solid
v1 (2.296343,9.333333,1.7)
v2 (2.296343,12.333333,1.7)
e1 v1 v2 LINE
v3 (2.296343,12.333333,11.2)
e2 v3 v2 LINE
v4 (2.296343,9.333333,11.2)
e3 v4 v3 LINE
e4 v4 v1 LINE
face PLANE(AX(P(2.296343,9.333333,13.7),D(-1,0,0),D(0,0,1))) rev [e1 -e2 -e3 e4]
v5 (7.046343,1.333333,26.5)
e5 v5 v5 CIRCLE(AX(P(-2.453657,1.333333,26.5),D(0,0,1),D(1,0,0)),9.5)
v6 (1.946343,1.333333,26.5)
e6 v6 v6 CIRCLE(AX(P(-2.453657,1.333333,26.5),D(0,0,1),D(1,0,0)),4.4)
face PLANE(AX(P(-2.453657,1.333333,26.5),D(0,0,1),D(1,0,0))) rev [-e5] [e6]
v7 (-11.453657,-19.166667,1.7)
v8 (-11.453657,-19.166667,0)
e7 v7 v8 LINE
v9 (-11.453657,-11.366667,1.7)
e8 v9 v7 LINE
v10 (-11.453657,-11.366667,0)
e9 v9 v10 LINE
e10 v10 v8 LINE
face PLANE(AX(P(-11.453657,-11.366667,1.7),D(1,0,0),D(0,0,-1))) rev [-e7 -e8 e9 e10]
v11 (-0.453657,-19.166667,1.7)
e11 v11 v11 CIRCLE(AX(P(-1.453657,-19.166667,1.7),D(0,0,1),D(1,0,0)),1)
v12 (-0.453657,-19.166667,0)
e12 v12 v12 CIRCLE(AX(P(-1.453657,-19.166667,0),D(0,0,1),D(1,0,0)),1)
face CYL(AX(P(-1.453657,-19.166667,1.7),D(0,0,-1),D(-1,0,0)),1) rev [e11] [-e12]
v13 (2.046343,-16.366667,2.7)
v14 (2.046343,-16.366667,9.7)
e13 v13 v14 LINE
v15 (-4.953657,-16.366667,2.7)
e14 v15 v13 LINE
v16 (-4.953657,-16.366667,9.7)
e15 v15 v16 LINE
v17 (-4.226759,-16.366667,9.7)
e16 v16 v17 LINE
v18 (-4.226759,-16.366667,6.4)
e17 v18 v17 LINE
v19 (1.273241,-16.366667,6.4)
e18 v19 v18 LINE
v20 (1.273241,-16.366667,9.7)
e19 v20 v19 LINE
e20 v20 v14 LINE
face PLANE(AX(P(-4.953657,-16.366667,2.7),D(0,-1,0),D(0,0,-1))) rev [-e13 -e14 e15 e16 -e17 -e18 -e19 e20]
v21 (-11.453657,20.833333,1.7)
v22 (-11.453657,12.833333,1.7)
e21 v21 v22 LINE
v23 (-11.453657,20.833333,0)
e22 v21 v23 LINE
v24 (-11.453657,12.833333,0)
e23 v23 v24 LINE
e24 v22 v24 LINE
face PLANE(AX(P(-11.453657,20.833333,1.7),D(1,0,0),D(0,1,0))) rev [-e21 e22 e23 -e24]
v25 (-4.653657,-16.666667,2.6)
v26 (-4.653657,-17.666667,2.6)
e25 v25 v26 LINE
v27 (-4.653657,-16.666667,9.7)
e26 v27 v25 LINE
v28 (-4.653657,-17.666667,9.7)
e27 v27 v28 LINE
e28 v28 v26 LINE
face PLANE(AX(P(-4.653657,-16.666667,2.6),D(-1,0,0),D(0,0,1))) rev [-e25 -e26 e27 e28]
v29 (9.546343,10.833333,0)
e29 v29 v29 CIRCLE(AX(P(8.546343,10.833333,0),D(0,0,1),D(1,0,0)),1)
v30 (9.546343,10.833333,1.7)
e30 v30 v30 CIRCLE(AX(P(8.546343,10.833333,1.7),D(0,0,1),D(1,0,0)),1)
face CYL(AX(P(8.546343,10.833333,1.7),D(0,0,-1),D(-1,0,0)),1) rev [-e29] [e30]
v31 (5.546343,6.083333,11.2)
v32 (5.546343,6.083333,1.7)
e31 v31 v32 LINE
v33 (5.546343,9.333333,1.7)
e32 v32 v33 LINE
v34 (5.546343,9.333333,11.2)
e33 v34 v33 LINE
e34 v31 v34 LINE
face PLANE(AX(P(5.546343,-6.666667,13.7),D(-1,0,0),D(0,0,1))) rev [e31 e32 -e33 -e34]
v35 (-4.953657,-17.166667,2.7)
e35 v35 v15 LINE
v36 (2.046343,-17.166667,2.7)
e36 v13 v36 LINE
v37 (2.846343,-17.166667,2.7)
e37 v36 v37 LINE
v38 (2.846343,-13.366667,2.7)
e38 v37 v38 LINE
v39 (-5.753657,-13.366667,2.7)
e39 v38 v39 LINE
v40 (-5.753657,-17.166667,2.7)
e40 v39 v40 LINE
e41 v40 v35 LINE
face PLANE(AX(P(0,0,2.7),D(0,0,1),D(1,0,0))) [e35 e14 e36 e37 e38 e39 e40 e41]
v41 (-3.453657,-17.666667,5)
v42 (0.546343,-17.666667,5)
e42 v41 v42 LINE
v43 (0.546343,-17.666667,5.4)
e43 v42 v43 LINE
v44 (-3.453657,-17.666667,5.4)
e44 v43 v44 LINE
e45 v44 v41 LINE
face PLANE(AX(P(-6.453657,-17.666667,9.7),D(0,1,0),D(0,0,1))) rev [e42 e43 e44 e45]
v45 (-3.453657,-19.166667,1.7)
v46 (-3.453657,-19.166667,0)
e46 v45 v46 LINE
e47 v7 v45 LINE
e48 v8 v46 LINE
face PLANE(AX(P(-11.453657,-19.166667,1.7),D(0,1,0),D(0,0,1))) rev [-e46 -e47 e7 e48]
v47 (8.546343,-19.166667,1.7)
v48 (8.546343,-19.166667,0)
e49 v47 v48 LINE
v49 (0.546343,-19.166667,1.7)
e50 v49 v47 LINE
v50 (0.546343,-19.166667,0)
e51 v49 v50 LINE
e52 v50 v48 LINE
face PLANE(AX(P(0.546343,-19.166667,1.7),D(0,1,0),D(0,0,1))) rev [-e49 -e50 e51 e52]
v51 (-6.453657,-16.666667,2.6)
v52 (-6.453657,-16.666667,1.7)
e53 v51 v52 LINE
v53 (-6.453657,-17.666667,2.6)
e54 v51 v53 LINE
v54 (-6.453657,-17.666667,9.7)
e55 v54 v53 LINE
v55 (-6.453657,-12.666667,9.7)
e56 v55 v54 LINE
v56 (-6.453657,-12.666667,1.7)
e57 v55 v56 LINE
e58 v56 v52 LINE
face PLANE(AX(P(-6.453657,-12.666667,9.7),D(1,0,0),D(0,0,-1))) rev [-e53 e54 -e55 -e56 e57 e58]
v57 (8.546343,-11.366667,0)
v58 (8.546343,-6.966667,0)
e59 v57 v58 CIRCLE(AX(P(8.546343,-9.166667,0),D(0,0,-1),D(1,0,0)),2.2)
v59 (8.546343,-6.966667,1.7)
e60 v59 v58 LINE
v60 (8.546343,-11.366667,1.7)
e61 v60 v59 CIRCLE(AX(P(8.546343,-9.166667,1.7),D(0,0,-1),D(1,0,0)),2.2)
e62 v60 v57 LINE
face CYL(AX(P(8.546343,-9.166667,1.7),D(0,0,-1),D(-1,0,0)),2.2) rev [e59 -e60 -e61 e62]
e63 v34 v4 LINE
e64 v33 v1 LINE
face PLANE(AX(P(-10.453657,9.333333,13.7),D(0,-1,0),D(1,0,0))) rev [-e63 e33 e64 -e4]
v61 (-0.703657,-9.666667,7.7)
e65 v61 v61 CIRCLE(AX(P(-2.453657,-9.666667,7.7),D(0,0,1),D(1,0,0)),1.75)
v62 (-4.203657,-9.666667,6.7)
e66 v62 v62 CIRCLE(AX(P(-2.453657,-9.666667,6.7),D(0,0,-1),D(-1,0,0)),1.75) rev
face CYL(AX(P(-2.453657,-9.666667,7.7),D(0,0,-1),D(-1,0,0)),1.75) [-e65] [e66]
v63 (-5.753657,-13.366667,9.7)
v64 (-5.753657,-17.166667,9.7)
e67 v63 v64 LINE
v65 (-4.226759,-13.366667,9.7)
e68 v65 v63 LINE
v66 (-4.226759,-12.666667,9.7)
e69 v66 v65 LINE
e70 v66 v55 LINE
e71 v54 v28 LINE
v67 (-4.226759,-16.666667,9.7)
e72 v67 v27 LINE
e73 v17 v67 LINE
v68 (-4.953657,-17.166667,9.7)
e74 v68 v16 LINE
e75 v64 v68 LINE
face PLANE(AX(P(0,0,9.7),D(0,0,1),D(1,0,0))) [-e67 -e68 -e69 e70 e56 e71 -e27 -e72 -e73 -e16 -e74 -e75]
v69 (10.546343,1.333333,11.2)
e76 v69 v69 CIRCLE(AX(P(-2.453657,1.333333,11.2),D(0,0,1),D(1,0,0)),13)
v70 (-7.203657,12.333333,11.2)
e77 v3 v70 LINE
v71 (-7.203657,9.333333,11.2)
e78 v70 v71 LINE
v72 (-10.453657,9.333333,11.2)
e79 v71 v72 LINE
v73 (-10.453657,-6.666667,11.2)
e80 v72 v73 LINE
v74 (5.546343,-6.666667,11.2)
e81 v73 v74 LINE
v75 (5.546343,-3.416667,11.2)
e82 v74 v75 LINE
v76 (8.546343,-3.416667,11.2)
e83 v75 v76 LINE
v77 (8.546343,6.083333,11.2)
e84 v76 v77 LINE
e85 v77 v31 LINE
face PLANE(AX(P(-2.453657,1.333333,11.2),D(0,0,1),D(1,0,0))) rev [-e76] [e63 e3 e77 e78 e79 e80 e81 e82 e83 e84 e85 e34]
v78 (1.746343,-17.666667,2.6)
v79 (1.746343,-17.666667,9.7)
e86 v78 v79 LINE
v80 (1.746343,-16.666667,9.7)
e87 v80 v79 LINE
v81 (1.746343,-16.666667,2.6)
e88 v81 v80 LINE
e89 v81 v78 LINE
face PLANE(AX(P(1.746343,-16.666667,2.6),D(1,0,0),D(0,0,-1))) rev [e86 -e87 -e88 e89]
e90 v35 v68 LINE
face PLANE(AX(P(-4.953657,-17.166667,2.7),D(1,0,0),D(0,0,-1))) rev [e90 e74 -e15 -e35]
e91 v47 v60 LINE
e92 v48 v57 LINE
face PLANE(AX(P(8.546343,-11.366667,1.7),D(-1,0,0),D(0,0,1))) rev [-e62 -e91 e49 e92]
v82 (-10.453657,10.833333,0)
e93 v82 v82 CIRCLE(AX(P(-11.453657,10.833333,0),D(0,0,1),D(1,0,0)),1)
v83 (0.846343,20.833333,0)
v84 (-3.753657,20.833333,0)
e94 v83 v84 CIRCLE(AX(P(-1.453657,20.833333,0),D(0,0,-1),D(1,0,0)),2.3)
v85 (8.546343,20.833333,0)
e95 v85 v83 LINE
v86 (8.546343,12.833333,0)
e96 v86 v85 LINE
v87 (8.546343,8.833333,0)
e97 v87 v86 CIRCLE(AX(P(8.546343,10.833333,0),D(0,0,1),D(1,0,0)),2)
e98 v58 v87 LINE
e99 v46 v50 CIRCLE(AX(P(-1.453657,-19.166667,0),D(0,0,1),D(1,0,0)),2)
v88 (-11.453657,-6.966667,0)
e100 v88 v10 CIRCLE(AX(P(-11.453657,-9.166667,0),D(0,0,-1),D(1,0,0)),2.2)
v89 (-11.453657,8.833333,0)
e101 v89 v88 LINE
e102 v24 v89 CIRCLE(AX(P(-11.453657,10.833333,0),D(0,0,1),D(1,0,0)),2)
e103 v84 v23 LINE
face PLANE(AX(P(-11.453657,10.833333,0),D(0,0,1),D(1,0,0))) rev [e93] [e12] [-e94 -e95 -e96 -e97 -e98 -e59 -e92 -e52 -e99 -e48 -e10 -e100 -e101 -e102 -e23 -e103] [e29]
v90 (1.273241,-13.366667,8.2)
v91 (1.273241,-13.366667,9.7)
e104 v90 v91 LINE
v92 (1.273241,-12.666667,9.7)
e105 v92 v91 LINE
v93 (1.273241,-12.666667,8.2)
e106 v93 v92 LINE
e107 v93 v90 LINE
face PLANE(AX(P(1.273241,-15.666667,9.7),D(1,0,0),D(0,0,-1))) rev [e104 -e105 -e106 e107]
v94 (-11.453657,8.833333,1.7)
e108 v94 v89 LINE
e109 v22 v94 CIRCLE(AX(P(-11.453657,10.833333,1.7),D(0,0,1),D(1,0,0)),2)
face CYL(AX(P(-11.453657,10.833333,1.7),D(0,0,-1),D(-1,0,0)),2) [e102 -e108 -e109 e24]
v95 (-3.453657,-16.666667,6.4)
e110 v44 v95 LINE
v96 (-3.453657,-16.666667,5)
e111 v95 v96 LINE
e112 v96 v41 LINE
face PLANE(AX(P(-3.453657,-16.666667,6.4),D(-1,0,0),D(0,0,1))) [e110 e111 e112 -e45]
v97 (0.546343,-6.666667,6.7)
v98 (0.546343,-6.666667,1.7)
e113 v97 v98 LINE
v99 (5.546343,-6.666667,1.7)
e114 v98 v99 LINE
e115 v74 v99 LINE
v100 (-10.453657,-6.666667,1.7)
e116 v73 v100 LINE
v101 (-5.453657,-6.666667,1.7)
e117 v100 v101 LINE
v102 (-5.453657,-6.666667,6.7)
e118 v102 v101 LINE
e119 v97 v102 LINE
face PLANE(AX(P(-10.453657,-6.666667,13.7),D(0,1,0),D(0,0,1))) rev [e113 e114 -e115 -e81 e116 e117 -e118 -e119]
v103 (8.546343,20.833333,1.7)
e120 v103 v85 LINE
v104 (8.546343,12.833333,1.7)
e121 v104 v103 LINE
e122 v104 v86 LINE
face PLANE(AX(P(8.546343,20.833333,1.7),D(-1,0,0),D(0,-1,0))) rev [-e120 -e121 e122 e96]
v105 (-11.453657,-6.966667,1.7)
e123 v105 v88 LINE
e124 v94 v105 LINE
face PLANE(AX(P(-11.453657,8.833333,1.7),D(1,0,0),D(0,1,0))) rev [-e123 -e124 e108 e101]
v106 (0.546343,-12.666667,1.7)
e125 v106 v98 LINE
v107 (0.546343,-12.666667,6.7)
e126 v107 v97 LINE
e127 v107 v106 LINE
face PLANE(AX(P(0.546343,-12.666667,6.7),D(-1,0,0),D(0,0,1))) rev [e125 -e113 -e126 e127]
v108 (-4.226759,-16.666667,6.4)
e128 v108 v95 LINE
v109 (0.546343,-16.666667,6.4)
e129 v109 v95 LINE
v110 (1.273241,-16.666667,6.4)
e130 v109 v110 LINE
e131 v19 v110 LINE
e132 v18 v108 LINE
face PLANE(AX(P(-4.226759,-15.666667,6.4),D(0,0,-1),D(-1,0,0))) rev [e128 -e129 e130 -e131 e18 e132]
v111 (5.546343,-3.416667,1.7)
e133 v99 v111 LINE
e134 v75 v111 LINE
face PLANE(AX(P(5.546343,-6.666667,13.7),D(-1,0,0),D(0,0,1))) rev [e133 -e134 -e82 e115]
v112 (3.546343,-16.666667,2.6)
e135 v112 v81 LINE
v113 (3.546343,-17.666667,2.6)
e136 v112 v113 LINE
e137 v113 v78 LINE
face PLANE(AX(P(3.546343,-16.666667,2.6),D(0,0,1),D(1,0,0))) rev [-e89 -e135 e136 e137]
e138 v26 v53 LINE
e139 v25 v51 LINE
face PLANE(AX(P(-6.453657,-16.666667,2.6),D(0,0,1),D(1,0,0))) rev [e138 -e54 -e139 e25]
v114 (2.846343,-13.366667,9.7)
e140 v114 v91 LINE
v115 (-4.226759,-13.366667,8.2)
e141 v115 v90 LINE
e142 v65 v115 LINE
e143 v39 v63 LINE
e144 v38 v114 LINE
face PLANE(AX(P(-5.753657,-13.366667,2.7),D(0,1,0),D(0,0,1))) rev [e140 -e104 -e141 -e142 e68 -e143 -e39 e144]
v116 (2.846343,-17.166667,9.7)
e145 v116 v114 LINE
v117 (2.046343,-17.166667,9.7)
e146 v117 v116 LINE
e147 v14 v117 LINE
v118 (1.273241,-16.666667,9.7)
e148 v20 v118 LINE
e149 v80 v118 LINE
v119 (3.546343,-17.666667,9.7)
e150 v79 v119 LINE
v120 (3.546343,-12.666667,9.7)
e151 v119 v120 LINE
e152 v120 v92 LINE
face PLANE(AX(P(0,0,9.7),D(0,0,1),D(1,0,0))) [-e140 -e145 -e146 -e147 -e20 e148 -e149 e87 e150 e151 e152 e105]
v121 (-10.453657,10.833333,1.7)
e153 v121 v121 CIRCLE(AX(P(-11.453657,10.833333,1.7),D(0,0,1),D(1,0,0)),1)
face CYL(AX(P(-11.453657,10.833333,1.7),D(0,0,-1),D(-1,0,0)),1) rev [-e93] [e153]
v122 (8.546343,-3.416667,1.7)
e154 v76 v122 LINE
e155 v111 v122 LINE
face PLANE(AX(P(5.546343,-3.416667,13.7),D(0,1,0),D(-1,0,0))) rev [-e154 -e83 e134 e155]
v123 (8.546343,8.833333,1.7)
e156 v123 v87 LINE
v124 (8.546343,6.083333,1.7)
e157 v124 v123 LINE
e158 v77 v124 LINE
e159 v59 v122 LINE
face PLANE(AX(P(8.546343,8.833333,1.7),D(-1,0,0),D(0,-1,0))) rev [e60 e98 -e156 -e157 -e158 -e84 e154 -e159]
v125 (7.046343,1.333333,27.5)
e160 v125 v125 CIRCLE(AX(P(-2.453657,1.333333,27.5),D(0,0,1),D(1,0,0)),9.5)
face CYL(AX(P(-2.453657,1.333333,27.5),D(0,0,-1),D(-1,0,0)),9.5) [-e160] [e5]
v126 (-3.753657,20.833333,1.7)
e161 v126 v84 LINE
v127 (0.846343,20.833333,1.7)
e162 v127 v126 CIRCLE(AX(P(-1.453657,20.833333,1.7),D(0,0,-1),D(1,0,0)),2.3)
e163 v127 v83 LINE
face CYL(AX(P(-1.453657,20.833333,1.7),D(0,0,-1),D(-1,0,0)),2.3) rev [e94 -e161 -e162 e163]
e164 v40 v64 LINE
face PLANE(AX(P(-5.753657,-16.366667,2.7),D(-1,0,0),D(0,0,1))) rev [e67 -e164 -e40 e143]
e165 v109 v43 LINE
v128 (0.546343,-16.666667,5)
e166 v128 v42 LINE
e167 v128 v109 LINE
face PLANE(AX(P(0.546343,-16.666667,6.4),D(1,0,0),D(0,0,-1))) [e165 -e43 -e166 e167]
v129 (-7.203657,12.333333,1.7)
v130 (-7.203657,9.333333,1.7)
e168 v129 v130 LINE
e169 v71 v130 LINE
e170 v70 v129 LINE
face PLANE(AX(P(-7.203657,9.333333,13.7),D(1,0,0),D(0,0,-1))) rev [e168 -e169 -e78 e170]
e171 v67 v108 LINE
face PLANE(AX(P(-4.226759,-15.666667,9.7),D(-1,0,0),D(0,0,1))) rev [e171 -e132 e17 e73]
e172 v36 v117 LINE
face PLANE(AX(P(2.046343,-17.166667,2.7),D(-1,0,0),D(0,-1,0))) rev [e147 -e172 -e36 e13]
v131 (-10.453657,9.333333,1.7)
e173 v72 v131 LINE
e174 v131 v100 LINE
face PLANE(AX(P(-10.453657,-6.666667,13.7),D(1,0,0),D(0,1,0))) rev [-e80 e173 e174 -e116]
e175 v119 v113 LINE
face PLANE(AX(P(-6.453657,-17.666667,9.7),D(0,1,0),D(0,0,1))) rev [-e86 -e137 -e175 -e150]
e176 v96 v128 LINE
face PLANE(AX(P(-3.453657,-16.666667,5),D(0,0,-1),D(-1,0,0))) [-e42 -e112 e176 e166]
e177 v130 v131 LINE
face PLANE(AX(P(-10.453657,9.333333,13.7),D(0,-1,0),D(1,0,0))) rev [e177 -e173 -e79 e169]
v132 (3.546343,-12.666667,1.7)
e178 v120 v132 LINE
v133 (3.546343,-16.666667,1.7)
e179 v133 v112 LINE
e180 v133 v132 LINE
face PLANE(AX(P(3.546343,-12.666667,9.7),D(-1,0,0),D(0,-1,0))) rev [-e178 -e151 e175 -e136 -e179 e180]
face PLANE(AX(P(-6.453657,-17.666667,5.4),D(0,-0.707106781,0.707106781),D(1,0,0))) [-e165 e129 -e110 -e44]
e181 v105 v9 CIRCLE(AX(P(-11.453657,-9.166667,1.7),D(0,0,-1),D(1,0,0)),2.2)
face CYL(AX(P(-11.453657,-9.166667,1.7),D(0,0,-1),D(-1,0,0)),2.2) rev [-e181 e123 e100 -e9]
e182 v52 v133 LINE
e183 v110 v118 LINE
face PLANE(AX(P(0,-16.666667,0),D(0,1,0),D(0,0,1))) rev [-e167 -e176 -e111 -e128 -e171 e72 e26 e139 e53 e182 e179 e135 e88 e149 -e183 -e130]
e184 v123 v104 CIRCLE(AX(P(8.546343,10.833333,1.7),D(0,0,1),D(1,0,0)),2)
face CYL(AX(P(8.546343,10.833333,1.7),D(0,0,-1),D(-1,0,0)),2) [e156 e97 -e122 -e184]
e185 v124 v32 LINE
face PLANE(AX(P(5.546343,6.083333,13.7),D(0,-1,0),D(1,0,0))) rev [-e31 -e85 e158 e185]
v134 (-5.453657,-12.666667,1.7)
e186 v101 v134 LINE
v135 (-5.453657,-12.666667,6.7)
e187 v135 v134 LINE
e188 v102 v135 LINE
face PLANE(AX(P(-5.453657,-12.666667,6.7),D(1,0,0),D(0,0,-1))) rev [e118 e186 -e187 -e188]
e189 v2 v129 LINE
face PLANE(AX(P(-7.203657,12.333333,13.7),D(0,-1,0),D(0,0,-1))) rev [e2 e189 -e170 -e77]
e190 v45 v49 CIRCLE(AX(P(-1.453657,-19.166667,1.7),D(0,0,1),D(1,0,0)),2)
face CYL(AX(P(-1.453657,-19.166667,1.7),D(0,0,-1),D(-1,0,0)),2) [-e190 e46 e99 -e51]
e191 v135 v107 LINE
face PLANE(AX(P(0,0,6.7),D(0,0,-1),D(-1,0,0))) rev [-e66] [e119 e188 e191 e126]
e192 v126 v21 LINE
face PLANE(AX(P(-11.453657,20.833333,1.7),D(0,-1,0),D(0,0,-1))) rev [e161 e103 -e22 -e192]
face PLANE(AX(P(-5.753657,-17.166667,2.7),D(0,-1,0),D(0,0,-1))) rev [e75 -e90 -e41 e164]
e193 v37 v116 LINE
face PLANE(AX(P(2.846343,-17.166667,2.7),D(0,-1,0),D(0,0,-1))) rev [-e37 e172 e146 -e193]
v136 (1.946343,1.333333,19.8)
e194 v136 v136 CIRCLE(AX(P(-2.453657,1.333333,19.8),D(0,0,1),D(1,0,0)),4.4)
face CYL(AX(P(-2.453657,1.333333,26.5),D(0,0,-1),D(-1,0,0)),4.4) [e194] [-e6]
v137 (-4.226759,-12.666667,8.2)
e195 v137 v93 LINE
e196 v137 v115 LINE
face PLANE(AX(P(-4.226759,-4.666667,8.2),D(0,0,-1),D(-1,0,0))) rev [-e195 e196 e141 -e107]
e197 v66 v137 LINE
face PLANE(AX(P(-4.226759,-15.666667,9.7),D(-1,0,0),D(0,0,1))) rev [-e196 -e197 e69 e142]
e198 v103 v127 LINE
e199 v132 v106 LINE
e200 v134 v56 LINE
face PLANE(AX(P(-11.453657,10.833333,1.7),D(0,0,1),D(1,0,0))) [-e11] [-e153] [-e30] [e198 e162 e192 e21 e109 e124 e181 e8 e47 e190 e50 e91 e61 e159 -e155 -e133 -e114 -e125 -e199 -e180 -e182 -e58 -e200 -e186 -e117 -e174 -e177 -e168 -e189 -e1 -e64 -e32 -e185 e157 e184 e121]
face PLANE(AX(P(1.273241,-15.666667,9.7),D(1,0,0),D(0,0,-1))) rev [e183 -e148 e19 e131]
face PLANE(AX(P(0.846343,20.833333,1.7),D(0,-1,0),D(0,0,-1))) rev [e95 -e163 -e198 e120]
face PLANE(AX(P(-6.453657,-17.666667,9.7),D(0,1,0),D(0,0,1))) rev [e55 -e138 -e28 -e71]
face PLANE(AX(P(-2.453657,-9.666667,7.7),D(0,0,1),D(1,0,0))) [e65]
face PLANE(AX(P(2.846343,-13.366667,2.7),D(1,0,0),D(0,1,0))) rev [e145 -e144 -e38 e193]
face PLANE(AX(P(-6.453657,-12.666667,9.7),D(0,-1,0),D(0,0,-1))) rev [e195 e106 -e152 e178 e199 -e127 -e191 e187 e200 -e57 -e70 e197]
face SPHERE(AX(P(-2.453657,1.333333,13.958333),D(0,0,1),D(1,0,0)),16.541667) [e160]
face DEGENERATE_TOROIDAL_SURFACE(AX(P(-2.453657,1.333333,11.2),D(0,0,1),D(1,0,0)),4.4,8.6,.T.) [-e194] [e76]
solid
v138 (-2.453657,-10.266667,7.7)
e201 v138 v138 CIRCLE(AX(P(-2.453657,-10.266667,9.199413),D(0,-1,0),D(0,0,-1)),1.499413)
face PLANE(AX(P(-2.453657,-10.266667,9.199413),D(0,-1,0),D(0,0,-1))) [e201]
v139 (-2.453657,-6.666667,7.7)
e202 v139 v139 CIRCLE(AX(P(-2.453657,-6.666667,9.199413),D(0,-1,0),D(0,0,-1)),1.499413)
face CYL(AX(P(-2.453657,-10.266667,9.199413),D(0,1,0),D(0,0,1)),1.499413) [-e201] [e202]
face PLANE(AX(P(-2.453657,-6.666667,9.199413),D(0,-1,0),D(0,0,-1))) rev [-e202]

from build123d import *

# Parameters (mm, degrees)
ESQUISSE1_R             = 1
BOSS_EXTRU_1_DEPTH      = 1.7
ESQUISSE2_W             = 10
ESQUISSE2_H             = 5
BOSS_EXTRU_2_DEPTH      = 8
ESQUISSE3_W             = 4
ESQUISSE3_H             = 1.4
ENL_V_MAT_EXTRU_1_DEPTH = 1
CHANFREIN2_SIZE         = 1
ESQUISSE4_W             = 5.5
ESQUISSE4_H             = 3.3
ENL_V_MAT_EXTRU_2_DEPTH = 1
ESQUISSE5_W             = 5.5
ESQUISSE5_H             = 1.5
ENL_V_MAT_EXTRU_3_DEPTH = 11
ENL_V_MAT_EXTRU_4_DEPTH = 7
ESQUISSE7_W             = 6
ESQUISSE7_H             = 6
BOSS_EXTRU_3_DEPTH      = 5
ESQUISSE8_R             = 1.75
BOSS_EXTRU_4_DEPTH      = 1
ESQUISSE9_W             = 16
ESQUISSE9_H             = 16
BOSS_EXTRU_5_DEPTH      = 12
ESQUISSE10_W            = 9.5
ESQUISSE10_H            = 3
ESQUISSE10_W_2          = 3
ESQUISSE10_H_2          = 9.5
BOSS_EXTRU_6_DEPTH      = 12
ESQUISSE12_W            = 32.197385869
ESQUISSE12_H            = 22.732769694
ENL_V_MAT_EXTRU_5_DEPTH = 2.5
ESQUISSE13_R            = 13
BOSS_EXTRU_7_DEPTH      = 8.6
CONG_1_R                = 8.6
ESQUISSE14_R            = 4.4
BOSS_EXTRU_8_DEPTH      = 6.7
ESQUISSE15_R            = 9.5
BOSS_EXTRU_9_DEPTH      = 1
D_ME1_FACE_RADIUS       = 9.5
D_ME1_HEIGHT            = 3
ESQUISSE18_R            = 1.499413023
BOSS_EXTRU_11_DEPTH     = 3.6


with BuildPart() as part:
    # Esquisse1 → Boss.-Extru.1 (new body)
    with BuildSketch(Plane.XY):
        with BuildLine():
            Line((-11.45365733, 20.833333333), (-3.75365733, 20.833333333))
            ThreePointArc((-3.75365733, 20.833333333), (-1.45365733, 18.533333333), (0.84634267, 20.833333333))
            Line((0.84634267, 20.833333333), (8.54634267, 20.833333333))
            Line((8.54634267, 20.833333333), (8.54634267, 12.833333333))
            ThreePointArc((8.54634267, 12.833333333), (10.54634267, 10.833333333), (8.54634267, 8.833333333))
            Line((8.54634267, 8.833333333), (8.54634267, -6.966666667))
            ThreePointArc((8.54634267, -6.966666667), (6.34634267, -9.166666667), (8.54634267, -11.366666667))
            Line((8.54634267, -11.366666667), (8.54634267, -19.166666667))
            Line((8.54634267, -19.166666667), (0.54634267, -19.166666667))
            ThreePointArc((0.54634267, -19.166666667), (-1.45365733, -21.166666667), (-3.45365733, -19.166666667))
            Line((-3.45365733, -19.166666667), (-11.45365733, -19.166666667))
            Line((-11.45365733, -19.166666667), (-11.45365733, -11.366666667))
            ThreePointArc((-11.45365733, -11.366666667), (-9.25365733, -9.166666667), (-11.45365733, -6.966666667))
            Line((-11.45365733, -6.966666667), (-11.45365733, 8.833333333))
            ThreePointArc((-11.45365733, 8.833333333), (-13.45365733, 10.833333333), (-11.45365733, 12.833333333))
            Line((-11.45365733, 12.833333333), (-11.45365733, 20.833333333))
        make_face()
        with Locations((-11.45365733, 10.833333333)):
            Circle(ESQUISSE1_R, mode=Mode.SUBTRACT)
        with Locations((8.54634267, 10.833333333)):
            Circle(ESQUISSE1_R, mode=Mode.SUBTRACT)
        with Locations((-1.45365733, -19.166666667)):
            Circle(ESQUISSE1_R, mode=Mode.SUBTRACT)
    extrude(amount=BOSS_EXTRU_1_DEPTH)

    # Esquisse2 → Boss.-Extru.2 (add)
    with BuildSketch(Plane.XY.offset(1.7)):
        with Locations((-1.45365733, -15.166666667)):
            Rectangle(ESQUISSE2_W, ESQUISSE2_H)
    extrude(amount=BOSS_EXTRU_2_DEPTH)

    # Esquisse3 → Enlèv. mat.-Extru.1 (cut)
    with BuildSketch(Plane.XZ.offset(17.666666667)):
        Polygon((-6.45365733, 1.7), (3.54634267, 1.7), (3.54634267, 2.6), (1.74634267, 2.6), (1.74634267, 9.7), (-4.65365733, 9.7), (-4.65365733, 2.6), (-6.45365733, 2.6), align=None)
        with Locations((-1.45365733, 5.7)):
            Rectangle(ESQUISSE3_W, ESQUISSE3_H, mode=Mode.SUBTRACT)
    extrude(amount=-ENL_V_MAT_EXTRU_1_DEPTH, mode=Mode.SUBTRACT)

    # Chanfrein2
    chanfrein2_edges = [part.edges().sort_by_distance(p)[0] for p in [
        (-1.45365733, -17.666666667, 6.4),
    ]]
    chamfer(chanfrein2_edges, length=CHANFREIN2_SIZE - 0.0001)  # a hair under: the kernel refuses the full size

    # Esquisse4 → Enlèv. mat.-Extru.2 (cut)
    with BuildSketch(Plane.XZ.offset(16.666666667)):
        with Locations((-1.476758853, 8.05)):
            Rectangle(ESQUISSE4_W, ESQUISSE4_H)
    extrude(amount=-ENL_V_MAT_EXTRU_2_DEPTH, mode=Mode.SUBTRACT)

    # Esquisse5 → Enlèv. mat.-Extru.3 (cut)
    with BuildSketch(Plane.XZ.offset(15.666666667)):
        with Locations((-1.476758853, 8.95)):
            Rectangle(ESQUISSE5_W, ESQUISSE5_H)
    extrude(amount=-ENL_V_MAT_EXTRU_3_DEPTH, mode=Mode.SUBTRACT)

    # Esquisse6 → Enlèv. mat.-Extru.4 (cut)
    with BuildSketch(Plane.XY.offset(9.7)):
        Polygon((-5.75365733, -13.366666667), (2.84634267, -13.366666667), (2.84634267, -16.366666667), (2.84634267, -17.166666667), (2.04634267, -17.166666667), (2.04634267, -16.366666667), (-4.95365733, -16.366666667), (-4.95365733, -17.166666667), (-5.75365733, -17.166666667), (-5.75365733, -16.366666667), align=None)
    extrude(amount=-ENL_V_MAT_EXTRU_4_DEPTH, mode=Mode.SUBTRACT)

    # Esquisse7 → Boss.-Extru.3 (add)
    with BuildSketch(Plane.XY.offset(1.7)):
        with Locations((-2.45365733, -9.666666667)):
            Rectangle(ESQUISSE7_W, ESQUISSE7_H)
    extrude(amount=BOSS_EXTRU_3_DEPTH)

    # Esquisse8 → Boss.-Extru.4 (add)
    with BuildSketch(Plane.XY.offset(6.7)):
        with Locations(Location((-2.45365733, -9.666666667, 0), (0, 0, 180))):
            Circle(ESQUISSE8_R)
    extrude(amount=BOSS_EXTRU_4_DEPTH)

    # Esquisse9 → Boss.-Extru.5 (add)
    with BuildSketch(Plane.XY.offset(1.7)):
        with Locations((-2.45365733, 1.333333333)):
            Rectangle(ESQUISSE9_W, ESQUISSE9_H)
    extrude(amount=BOSS_EXTRU_5_DEPTH)

    # Esquisse10 → Boss.-Extru.6 (add)
    with BuildSketch(Plane.XY.offset(1.7)):
        with Locations((-2.45365733, 10.833333333)):
            Rectangle(ESQUISSE10_W, ESQUISSE10_H)
        with Locations((7.04634267, 1.333333333)):
            Rectangle(ESQUISSE10_W_2, ESQUISSE10_H_2)
    extrude(amount=BOSS_EXTRU_6_DEPTH)

    # Esquisse12 → Enlèv. mat.-Extru.5 (cut)
    with BuildSketch(Plane.XY.offset(13.7)):
        with Locations((-0.834476833, 3.194598891)):
            Rectangle(ESQUISSE12_W, ESQUISSE12_H)
    extrude(amount=-ENL_V_MAT_EXTRU_5_DEPTH, mode=Mode.SUBTRACT)

    # Esquisse13 → Boss.-Extru.7 (add)
    with BuildSketch(Plane.XY.offset(11.2)):
        with Locations(Location((-2.45365733, 1.333333333, 0), (0, 0, 180))):
            Circle(ESQUISSE13_R)
    extrude(amount=BOSS_EXTRU_7_DEPTH)

    # Congé1
    cong_1_edges = [part.edges().sort_by_distance(p)[0] for p in [
        (10.54634267, 1.333333333, 19.8),
    ]]
    fillet(cong_1_edges, radius=CONG_1_R - 0.0001)  # a hair under: the kernel refuses the full size

    # Esquisse14 → Boss.-Extru.8 (add)
    with BuildSketch(Plane.XY.offset(19.8)):
        with Locations((-2.45365733, 1.333333333)):
            Circle(ESQUISSE14_R)
    extrude(amount=BOSS_EXTRU_8_DEPTH)

    # Esquisse15 → Boss.-Extru.9 (add)
    with BuildSketch(Plane.XY.offset(26.5)):
        with Locations((-2.45365733, 1.333333333)):
            Circle(ESQUISSE15_R)
    extrude(amount=BOSS_EXTRU_9_DEPTH)

    # Dôme1: a dome of height H over a round flat face of radius A is a cap of a sphere of radius (A * A + H * H) / (2 * H)
    d_me1_r = (D_ME1_FACE_RADIUS * D_ME1_FACE_RADIUS + D_ME1_HEIGHT * D_ME1_HEIGHT) / (2 * D_ME1_HEIGHT)
    d_me1_base = Plane((-2.45365733, 1.333333333, 27.5), z_dir=(0, 0, 1))
    with Locations(d_me1_base.offset(D_ME1_HEIGHT - d_me1_r)):
        d_me1_ball = Sphere(d_me1_r, mode=Mode.PRIVATE)
    add(split(d_me1_ball, bisect_by=d_me1_base, keep=Keep.TOP, mode=Mode.PRIVATE))


with BuildPart() as body_2:
    # Esquisse18 → Boss.-Extru.11 (new body)
    with BuildSketch(Plane.XZ.offset(6.666666667)):
        with Locations(Location((-2.45365733, 9.199413023, 0), (0, 0, 270))):
            Circle(ESQUISSE18_R)
    extrude(amount=BOSS_EXTRU_11_DEPTH)


solid = Compound([part.part, body_2.part])
